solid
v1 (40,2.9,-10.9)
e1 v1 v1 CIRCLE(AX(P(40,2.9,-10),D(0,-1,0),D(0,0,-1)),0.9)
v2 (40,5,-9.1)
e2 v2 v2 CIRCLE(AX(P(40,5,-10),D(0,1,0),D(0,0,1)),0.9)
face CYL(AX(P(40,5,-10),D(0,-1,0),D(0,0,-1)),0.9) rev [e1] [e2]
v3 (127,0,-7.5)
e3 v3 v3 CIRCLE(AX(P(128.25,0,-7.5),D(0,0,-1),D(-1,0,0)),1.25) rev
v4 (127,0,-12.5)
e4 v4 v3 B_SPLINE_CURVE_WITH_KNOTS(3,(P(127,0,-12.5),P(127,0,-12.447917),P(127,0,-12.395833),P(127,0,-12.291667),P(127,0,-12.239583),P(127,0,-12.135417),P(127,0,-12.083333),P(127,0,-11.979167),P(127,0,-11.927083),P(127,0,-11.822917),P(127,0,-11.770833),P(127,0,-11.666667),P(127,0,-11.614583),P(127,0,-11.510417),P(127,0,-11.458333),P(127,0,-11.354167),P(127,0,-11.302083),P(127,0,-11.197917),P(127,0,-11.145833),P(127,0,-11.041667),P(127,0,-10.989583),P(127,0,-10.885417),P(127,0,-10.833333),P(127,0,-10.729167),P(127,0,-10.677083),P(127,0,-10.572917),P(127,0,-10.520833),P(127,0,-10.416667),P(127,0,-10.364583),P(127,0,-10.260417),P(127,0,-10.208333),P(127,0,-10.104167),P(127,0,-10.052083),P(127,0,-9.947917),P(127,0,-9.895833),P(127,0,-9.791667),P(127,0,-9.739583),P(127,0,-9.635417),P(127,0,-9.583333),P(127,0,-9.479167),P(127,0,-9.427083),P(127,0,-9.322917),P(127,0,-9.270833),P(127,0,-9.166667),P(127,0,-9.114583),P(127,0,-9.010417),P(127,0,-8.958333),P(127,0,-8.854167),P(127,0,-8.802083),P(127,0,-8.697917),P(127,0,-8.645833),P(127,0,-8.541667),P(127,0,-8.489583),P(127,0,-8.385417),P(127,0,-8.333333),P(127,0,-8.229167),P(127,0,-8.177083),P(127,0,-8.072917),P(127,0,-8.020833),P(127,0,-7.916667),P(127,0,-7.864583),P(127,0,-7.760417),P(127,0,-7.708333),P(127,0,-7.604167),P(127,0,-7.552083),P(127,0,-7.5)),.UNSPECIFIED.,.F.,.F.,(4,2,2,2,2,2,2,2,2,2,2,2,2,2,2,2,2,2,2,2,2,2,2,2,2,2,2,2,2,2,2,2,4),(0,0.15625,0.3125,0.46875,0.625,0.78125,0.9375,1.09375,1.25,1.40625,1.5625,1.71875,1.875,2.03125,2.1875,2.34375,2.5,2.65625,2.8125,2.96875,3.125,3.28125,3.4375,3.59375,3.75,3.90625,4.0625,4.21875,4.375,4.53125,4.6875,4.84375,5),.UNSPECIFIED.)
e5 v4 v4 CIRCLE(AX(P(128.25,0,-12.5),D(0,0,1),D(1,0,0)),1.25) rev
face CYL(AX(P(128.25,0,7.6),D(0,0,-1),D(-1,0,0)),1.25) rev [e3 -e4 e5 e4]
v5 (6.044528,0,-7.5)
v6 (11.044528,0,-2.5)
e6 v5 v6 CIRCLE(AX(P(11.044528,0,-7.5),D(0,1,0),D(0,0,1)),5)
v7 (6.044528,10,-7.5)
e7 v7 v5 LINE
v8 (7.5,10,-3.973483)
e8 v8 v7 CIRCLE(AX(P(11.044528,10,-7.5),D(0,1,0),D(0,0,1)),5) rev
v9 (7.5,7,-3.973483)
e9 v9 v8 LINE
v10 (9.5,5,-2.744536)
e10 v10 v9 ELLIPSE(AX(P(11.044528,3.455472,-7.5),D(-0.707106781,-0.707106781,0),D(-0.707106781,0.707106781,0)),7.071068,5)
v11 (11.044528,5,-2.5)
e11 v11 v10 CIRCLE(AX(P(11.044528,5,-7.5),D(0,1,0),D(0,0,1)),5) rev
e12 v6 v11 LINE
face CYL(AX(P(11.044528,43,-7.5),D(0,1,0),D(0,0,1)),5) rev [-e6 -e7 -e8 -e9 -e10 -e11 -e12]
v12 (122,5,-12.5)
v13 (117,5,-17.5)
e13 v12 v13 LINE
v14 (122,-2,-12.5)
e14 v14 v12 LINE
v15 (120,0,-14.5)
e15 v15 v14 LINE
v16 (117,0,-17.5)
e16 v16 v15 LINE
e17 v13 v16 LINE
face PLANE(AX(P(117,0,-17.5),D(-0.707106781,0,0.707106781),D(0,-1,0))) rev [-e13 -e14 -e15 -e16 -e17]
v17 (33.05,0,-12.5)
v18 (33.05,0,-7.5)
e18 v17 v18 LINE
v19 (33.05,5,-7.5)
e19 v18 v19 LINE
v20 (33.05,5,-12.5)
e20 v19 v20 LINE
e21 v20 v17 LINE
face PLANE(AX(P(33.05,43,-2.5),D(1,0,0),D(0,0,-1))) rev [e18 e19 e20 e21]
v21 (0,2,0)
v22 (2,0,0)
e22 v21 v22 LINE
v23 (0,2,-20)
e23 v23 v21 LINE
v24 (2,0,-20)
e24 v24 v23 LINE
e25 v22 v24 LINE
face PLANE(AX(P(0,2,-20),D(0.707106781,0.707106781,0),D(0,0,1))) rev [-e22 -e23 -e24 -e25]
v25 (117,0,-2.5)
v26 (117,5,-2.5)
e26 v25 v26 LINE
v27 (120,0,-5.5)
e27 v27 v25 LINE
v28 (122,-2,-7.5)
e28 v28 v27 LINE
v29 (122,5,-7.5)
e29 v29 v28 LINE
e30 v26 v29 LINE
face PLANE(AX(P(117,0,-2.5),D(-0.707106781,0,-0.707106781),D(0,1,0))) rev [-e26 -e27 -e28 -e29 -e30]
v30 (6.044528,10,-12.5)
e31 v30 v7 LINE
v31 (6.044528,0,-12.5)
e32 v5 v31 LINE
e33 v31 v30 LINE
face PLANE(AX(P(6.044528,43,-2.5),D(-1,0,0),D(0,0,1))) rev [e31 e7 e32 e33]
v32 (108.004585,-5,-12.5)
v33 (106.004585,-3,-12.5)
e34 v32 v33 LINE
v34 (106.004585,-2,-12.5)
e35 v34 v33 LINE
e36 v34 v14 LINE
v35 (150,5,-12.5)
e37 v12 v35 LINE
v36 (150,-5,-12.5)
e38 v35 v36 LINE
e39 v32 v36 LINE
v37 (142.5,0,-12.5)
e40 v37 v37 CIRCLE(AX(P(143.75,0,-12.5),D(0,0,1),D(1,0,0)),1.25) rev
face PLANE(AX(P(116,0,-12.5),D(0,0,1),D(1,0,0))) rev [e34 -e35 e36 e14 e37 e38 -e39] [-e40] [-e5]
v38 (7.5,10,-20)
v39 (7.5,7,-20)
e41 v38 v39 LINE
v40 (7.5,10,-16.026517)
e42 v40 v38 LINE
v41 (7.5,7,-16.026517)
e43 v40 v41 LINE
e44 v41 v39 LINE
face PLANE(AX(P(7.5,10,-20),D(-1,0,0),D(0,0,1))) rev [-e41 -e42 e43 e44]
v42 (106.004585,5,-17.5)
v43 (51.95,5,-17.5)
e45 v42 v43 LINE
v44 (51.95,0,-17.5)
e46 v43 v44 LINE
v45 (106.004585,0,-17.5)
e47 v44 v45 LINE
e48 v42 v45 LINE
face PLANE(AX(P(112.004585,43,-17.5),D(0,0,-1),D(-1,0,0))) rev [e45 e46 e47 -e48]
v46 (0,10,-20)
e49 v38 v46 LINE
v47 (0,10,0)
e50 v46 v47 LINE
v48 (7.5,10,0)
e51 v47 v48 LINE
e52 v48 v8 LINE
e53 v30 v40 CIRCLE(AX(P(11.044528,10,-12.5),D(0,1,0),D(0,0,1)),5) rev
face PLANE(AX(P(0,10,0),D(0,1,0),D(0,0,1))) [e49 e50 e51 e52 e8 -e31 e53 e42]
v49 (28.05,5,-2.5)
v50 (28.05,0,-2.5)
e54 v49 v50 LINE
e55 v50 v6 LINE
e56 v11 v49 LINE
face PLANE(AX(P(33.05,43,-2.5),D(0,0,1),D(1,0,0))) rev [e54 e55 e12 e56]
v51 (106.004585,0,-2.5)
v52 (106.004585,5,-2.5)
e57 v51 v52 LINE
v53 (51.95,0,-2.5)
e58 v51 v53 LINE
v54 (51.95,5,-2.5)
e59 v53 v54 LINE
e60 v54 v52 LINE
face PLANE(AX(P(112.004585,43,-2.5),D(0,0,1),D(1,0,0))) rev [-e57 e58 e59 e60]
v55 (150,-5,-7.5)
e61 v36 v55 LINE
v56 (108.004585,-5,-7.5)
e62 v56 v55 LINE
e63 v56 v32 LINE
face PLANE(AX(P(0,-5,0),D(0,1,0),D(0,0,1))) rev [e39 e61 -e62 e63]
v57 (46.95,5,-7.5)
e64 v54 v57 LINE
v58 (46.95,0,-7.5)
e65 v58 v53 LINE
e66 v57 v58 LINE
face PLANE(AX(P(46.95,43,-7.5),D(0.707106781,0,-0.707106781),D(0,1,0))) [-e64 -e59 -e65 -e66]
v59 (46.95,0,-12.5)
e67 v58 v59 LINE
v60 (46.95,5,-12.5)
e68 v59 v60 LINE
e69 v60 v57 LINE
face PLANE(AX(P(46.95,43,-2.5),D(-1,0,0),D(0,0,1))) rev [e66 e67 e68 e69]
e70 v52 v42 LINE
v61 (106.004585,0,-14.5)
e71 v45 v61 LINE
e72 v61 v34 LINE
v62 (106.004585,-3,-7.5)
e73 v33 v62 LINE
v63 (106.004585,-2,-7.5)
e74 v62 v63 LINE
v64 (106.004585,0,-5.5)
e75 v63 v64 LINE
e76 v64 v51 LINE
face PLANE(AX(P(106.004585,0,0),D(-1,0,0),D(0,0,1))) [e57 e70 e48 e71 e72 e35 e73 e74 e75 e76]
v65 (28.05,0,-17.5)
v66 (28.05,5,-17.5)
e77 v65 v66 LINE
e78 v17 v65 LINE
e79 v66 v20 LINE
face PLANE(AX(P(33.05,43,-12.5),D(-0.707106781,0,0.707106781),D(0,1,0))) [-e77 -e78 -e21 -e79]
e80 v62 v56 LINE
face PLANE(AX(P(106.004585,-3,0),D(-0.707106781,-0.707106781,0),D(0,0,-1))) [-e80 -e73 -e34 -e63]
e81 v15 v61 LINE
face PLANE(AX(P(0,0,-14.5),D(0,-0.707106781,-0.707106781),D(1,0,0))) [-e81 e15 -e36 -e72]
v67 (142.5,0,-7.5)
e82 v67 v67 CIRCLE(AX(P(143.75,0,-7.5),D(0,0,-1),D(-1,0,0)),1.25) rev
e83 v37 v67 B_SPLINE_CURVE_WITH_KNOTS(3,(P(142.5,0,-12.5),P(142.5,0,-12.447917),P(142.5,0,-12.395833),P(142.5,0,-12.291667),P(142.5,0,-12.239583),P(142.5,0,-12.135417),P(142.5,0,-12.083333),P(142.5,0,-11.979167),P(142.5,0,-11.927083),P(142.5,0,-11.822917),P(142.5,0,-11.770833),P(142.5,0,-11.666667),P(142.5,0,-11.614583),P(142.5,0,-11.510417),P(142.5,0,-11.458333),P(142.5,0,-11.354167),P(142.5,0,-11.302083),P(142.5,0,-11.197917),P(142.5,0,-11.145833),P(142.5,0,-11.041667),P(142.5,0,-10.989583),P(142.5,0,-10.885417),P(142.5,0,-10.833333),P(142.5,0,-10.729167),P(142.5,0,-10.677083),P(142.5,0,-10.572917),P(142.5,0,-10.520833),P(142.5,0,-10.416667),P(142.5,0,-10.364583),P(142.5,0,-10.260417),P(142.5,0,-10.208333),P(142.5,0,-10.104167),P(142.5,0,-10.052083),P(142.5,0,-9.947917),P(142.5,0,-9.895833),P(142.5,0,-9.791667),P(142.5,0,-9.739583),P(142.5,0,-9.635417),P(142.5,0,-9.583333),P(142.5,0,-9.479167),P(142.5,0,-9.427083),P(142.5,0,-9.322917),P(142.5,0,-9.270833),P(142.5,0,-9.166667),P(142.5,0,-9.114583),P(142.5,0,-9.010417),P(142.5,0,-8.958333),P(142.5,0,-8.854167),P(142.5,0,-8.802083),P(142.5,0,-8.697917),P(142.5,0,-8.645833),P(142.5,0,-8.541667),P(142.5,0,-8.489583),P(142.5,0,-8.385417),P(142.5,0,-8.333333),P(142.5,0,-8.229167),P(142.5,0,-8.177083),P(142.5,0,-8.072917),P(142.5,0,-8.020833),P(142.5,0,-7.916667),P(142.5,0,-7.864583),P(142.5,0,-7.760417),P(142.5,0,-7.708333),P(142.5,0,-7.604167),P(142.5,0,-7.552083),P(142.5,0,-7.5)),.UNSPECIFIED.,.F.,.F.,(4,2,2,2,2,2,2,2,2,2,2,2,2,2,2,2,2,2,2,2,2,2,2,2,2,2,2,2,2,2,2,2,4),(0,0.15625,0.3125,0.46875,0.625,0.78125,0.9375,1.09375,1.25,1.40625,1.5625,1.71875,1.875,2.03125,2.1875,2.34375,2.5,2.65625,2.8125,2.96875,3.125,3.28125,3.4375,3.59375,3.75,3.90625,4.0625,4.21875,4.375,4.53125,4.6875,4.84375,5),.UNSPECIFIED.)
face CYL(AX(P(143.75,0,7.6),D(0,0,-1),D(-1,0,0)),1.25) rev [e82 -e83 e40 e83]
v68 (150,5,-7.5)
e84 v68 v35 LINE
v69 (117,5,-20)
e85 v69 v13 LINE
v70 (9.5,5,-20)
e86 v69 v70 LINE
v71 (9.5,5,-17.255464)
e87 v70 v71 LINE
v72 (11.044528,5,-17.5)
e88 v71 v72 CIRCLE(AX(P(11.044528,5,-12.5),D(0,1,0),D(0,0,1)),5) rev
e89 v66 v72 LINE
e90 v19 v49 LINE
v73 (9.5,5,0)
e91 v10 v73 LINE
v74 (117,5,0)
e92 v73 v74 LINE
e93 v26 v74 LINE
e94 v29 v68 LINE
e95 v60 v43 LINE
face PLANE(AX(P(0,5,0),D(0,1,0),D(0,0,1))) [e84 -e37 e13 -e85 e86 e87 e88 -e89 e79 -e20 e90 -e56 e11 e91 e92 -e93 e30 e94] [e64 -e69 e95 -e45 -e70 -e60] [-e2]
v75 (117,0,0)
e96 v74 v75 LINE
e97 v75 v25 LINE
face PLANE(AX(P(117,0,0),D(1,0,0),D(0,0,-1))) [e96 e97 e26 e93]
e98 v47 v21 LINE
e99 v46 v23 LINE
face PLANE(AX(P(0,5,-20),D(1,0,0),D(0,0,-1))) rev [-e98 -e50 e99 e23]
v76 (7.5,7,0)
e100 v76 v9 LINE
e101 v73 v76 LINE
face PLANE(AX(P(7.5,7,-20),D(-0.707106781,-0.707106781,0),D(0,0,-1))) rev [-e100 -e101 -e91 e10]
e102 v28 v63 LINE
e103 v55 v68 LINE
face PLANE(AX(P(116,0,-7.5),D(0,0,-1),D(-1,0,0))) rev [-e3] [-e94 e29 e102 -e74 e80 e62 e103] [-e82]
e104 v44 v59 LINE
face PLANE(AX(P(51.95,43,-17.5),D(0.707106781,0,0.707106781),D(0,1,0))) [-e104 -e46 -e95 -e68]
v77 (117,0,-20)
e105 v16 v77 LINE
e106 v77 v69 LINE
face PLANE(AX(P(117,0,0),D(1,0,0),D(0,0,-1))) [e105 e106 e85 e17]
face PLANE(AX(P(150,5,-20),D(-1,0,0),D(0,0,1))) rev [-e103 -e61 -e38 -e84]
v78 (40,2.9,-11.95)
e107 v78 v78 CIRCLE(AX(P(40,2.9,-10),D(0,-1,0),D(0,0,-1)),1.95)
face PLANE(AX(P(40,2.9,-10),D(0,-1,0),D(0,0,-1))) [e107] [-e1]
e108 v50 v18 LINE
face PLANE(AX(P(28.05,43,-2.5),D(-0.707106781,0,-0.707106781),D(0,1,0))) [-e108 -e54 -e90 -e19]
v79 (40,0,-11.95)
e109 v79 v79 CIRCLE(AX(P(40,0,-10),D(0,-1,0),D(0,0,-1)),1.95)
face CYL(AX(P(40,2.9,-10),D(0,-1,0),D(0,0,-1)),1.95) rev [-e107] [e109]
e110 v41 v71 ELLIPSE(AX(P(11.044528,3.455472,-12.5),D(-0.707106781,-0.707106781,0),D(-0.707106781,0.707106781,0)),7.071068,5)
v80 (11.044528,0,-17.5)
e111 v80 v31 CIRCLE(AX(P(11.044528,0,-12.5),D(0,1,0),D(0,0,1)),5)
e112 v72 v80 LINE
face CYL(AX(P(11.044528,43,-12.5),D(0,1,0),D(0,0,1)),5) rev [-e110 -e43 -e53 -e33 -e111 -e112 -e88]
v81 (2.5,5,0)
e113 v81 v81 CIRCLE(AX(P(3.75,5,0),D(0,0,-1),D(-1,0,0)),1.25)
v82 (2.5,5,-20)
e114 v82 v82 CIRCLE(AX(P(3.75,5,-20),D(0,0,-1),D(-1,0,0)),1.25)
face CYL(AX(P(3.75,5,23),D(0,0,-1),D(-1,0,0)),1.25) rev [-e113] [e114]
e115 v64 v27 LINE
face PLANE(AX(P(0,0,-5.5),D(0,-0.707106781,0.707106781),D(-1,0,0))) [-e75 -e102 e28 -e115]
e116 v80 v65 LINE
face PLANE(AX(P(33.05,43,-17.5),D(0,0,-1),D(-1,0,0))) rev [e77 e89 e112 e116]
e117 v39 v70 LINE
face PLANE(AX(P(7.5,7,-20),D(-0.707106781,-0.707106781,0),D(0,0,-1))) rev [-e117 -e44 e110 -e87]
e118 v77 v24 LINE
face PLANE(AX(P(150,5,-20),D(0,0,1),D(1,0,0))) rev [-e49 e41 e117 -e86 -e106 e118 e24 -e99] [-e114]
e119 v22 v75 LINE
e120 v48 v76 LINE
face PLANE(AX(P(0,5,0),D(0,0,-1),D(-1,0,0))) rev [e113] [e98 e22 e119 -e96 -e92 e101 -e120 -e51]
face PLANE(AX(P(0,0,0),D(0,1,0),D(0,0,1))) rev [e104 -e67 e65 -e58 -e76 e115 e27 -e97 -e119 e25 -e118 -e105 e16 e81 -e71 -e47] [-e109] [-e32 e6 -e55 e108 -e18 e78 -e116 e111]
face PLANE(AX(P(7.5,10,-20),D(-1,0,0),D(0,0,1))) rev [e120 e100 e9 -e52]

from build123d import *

# Parameters (mm, degrees)
SKETCH1_W           = 150
SKETCH1_H           = 20
SKETCH1_R           = 0.9
BOSS_EXTRUDE1_DEPTH = 5
SKETCH2_R           = 1.95
CUT_EXTRUDE1_DEPTH  = 2.9
SKETCH3_W           = 55.59541546
SKETCH3_H           = 20
BOSS_EXTRUDE2_DEPTH = 5
SKETCH7_W           = 20
SKETCH7_H           = 5
CUT_EXTRUDE3_DEPTH  = 27.6
SKETCH5_R           = 1.25
CUT_EXTRUDE4_DEPTH  = 27.6
SKETCH8_W           = 7.5
SKETCH8_H           = 20
BOSS_EXTRUDE3_DEPTH = 5
SKETCH9_R           = 1.25
CUT_EXTRUDE5_DEPTH  = 43
CHAMFER2_SIZE       = 2
CHAMFER3_SIZE       = 2
CHAMFER4_SIZE       = 5
SKETCH12_W          = 65.05458454
SKETCH12_H          = 15
SKETCH12_W_2        = 27.005472272
CUT_EXTRUDE33_DEPTH = 43
FILLET3_R           = 5
CHAMFER5_SIZE       = 5
CUT_EXTRUDE35_DEPTH = 34
SKETCH14_W          = 15
SKETCH14_H          = 5
BOSS_EXTRUDE4_DEPTH = 6
BOSS_EXTRUDE5_DEPTH = 18
CHAMFER7_SIZE       = 2
BOSS_EXTRUDE6_DEPTH = 1
CHAMFER8_SIZE       = 5


with BuildPart() as part:
    # Sketch1 → Boss-Extrude1 (new body)
    with BuildSketch(Plane(origin=(0, 0, 0), x_dir=(1, 0, 0), z_dir=(0, 1, 0))):
        with Locations((75, 10)):
            Rectangle(SKETCH1_W, SKETCH1_H)
        with Locations(Location((40, 10, 0), (0, 0, 270))):
            Circle(SKETCH1_R, mode=Mode.SUBTRACT)
    extrude(amount=BOSS_EXTRUDE1_DEPTH)

    # Sketch2 → Cut-Extrude1 (cut)
    with BuildSketch(Plane.XZ):
        with Locations(Location((40, -10, 0), (0, 0, 270))):
            Circle(SKETCH2_R)
    extrude(amount=-CUT_EXTRUDE1_DEPTH, mode=Mode.SUBTRACT)

    # Sketch3 → Boss-Extrude2 (add)
    with BuildSketch(Plane.XZ):
        with Locations((122.20229227, -10)):
            Rectangle(SKETCH3_W, SKETCH3_H)
    extrude(amount=BOSS_EXTRUDE2_DEPTH)

    # Sketch7 → Cut-Extrude3 (cut)
    with BuildSketch(Plane.ZY.offset(-94.40458454)):
        with Locations((-10, -2.5)):
            Rectangle(SKETCH7_W, SKETCH7_H)
    extrude(amount=-CUT_EXTRUDE3_DEPTH, mode=Mode.SUBTRACT)

    # Sketch5 → Cut-Extrude4 (cut)
    with BuildSketch(Plane(origin=(0, 0, -20), x_dir=(-1, 0, 0), z_dir=(0, 0, -1))):
        with Locations((-128.25, 0)):
            Circle(SKETCH5_R)
        with Locations((-143.75, 0)):
            Circle(SKETCH5_R)
    extrude(amount=-CUT_EXTRUDE4_DEPTH, mode=Mode.SUBTRACT)

    # Sketch8 → Boss-Extrude3 (add)
    with BuildSketch(Plane(origin=(0, 5, 0), x_dir=(1, 0, 0), z_dir=(0, 1, 0))):
        with Locations((3.75, 10)):
            Rectangle(SKETCH8_W, SKETCH8_H)
    extrude(amount=BOSS_EXTRUDE3_DEPTH)

    # Sketch9 → Cut-Extrude5 (cut)
    with BuildSketch(Plane(origin=(0, 0, -20), x_dir=(-1, 0, 0), z_dir=(0, 0, -1))):
        with Locations((-3.75, 5)):
            Circle(SKETCH9_R)
    extrude(amount=-CUT_EXTRUDE5_DEPTH, mode=Mode.SUBTRACT)

    # Chamfer2
    chamfer2_edges = [part.edges().sort_by_distance(p)[0] for p in [
        (7.5, 5, -10),
    ]]
    chamfer(chamfer2_edges, length=CHAMFER2_SIZE)

    # Chamfer3
    chamfer3_edges = [part.edges().sort_by_distance(p)[0] for p in [
        (0, 0, -10),
    ]]
    chamfer(chamfer3_edges, length=CHAMFER3_SIZE)

    # Chamfer4
    chamfer4_edges = [part.edges().sort_by_distance(p)[0] for p in [
        (122.00458454, 0, -10),
    ]]
    chamfer(chamfer4_edges, length=CHAMFER4_SIZE - 0.0001)  # a hair under: the kernel refuses the full size

    # Sketch12 → Cut-Extrude33 (cut)
    with BuildSketch(Plane.XZ):
        with Locations((79.47729227, -10)):
            Rectangle(SKETCH12_W, SKETCH12_H)
        with Locations((19.547263864, -10)):
            Rectangle(SKETCH12_W_2, SKETCH12_H)
    extrude(amount=-CUT_EXTRUDE33_DEPTH, mode=Mode.SUBTRACT)

    # Fillet3
    fillet3_edges = [part.edges().sort_by_distance(p)[0] for p in [
        (6.044527728, 5, -17.5),
        (6.044527728, 5, -2.5),
    ]]
    fillet(fillet3_edges, radius=FILLET3_R)

    # Chamfer5
    chamfer5_edges = [part.edges().sort_by_distance(p)[0] for p in [
        (46.95, 2.5, -17.5),
        (46.95, 2.5, -2.5),
        (33.05, 2.5, -2.5),
        (33.05, 2.5, -17.5),
    ]]
    chamfer(chamfer5_edges, length=CHAMFER5_SIZE)

    # Sketch13 → Cut-Extrude35 (cut)
    with BuildSketch(Plane(origin=(150, 0, 0), x_dir=(0, 0, -1), z_dir=(1, 0, 0))):
        Polygon((5, 5), (0, 5), (0, -5), (5, -5), (7.5, -5), (7.5, 5), align=None)
        Polygon((15, 5), (12.5, 5), (12.5, -5), (15, -5), (20, -5), (20, 5), align=None)
    extrude(amount=-CUT_EXTRUDE35_DEPTH, mode=Mode.SUBTRACT)

    # Sketch14 → Boss-Extrude4 (add)
    with BuildSketch(Plane.ZY.offset(-112.00458454)):
        with Locations((-10, 2.5)):
            Rectangle(SKETCH14_W, SKETCH14_H)
    extrude(amount=BOSS_EXTRUDE4_DEPTH)

    # Sketch15 → Boss-Extrude5 (add)
    with BuildSketch(Plane.ZY.offset(-106.00458454)):
        Polygon((-10, 5), (-7.5, 5), (-7.5, -5), (-12.5, -5), (-12.5, 5), align=None)
    extrude(amount=-BOSS_EXTRUDE5_DEPTH)

    # Chamfer7
    chamfer7_edges = [part.edges().sort_by_distance(p)[0] for p in [
        (106.00458454, -5, -10),
        (111.00229227, 0, -7.5),
        (111.00229227, 0, -12.5),
    ]]
    chamfer(chamfer7_edges, length=CHAMFER7_SIZE)

    # Sketch17 → Boss-Extrude6 (add)
    with BuildSketch(Plane(origin=(116, 0, 0), x_dir=(0, 0, -1), z_dir=(1, 0, 0))):
        Polygon((0, 0), (5.5, 0), (7.5, -2), (7.5, 5), (0, 5), align=None)
        Polygon((12.5, 5), (12.5, -2), (14.5, 0), (20, 0), (20, 5), align=None)
    extrude(amount=BOSS_EXTRUDE6_DEPTH)

    # Chamfer8
    chamfer8_edges = [part.edges().sort_by_distance(p)[0] for p in [
        (117, 1.5, -12.5),
        (117, 1.5, -7.5),
    ]]
    chamfer(chamfer8_edges, length=CHAMFER8_SIZE)


solid = part.part
